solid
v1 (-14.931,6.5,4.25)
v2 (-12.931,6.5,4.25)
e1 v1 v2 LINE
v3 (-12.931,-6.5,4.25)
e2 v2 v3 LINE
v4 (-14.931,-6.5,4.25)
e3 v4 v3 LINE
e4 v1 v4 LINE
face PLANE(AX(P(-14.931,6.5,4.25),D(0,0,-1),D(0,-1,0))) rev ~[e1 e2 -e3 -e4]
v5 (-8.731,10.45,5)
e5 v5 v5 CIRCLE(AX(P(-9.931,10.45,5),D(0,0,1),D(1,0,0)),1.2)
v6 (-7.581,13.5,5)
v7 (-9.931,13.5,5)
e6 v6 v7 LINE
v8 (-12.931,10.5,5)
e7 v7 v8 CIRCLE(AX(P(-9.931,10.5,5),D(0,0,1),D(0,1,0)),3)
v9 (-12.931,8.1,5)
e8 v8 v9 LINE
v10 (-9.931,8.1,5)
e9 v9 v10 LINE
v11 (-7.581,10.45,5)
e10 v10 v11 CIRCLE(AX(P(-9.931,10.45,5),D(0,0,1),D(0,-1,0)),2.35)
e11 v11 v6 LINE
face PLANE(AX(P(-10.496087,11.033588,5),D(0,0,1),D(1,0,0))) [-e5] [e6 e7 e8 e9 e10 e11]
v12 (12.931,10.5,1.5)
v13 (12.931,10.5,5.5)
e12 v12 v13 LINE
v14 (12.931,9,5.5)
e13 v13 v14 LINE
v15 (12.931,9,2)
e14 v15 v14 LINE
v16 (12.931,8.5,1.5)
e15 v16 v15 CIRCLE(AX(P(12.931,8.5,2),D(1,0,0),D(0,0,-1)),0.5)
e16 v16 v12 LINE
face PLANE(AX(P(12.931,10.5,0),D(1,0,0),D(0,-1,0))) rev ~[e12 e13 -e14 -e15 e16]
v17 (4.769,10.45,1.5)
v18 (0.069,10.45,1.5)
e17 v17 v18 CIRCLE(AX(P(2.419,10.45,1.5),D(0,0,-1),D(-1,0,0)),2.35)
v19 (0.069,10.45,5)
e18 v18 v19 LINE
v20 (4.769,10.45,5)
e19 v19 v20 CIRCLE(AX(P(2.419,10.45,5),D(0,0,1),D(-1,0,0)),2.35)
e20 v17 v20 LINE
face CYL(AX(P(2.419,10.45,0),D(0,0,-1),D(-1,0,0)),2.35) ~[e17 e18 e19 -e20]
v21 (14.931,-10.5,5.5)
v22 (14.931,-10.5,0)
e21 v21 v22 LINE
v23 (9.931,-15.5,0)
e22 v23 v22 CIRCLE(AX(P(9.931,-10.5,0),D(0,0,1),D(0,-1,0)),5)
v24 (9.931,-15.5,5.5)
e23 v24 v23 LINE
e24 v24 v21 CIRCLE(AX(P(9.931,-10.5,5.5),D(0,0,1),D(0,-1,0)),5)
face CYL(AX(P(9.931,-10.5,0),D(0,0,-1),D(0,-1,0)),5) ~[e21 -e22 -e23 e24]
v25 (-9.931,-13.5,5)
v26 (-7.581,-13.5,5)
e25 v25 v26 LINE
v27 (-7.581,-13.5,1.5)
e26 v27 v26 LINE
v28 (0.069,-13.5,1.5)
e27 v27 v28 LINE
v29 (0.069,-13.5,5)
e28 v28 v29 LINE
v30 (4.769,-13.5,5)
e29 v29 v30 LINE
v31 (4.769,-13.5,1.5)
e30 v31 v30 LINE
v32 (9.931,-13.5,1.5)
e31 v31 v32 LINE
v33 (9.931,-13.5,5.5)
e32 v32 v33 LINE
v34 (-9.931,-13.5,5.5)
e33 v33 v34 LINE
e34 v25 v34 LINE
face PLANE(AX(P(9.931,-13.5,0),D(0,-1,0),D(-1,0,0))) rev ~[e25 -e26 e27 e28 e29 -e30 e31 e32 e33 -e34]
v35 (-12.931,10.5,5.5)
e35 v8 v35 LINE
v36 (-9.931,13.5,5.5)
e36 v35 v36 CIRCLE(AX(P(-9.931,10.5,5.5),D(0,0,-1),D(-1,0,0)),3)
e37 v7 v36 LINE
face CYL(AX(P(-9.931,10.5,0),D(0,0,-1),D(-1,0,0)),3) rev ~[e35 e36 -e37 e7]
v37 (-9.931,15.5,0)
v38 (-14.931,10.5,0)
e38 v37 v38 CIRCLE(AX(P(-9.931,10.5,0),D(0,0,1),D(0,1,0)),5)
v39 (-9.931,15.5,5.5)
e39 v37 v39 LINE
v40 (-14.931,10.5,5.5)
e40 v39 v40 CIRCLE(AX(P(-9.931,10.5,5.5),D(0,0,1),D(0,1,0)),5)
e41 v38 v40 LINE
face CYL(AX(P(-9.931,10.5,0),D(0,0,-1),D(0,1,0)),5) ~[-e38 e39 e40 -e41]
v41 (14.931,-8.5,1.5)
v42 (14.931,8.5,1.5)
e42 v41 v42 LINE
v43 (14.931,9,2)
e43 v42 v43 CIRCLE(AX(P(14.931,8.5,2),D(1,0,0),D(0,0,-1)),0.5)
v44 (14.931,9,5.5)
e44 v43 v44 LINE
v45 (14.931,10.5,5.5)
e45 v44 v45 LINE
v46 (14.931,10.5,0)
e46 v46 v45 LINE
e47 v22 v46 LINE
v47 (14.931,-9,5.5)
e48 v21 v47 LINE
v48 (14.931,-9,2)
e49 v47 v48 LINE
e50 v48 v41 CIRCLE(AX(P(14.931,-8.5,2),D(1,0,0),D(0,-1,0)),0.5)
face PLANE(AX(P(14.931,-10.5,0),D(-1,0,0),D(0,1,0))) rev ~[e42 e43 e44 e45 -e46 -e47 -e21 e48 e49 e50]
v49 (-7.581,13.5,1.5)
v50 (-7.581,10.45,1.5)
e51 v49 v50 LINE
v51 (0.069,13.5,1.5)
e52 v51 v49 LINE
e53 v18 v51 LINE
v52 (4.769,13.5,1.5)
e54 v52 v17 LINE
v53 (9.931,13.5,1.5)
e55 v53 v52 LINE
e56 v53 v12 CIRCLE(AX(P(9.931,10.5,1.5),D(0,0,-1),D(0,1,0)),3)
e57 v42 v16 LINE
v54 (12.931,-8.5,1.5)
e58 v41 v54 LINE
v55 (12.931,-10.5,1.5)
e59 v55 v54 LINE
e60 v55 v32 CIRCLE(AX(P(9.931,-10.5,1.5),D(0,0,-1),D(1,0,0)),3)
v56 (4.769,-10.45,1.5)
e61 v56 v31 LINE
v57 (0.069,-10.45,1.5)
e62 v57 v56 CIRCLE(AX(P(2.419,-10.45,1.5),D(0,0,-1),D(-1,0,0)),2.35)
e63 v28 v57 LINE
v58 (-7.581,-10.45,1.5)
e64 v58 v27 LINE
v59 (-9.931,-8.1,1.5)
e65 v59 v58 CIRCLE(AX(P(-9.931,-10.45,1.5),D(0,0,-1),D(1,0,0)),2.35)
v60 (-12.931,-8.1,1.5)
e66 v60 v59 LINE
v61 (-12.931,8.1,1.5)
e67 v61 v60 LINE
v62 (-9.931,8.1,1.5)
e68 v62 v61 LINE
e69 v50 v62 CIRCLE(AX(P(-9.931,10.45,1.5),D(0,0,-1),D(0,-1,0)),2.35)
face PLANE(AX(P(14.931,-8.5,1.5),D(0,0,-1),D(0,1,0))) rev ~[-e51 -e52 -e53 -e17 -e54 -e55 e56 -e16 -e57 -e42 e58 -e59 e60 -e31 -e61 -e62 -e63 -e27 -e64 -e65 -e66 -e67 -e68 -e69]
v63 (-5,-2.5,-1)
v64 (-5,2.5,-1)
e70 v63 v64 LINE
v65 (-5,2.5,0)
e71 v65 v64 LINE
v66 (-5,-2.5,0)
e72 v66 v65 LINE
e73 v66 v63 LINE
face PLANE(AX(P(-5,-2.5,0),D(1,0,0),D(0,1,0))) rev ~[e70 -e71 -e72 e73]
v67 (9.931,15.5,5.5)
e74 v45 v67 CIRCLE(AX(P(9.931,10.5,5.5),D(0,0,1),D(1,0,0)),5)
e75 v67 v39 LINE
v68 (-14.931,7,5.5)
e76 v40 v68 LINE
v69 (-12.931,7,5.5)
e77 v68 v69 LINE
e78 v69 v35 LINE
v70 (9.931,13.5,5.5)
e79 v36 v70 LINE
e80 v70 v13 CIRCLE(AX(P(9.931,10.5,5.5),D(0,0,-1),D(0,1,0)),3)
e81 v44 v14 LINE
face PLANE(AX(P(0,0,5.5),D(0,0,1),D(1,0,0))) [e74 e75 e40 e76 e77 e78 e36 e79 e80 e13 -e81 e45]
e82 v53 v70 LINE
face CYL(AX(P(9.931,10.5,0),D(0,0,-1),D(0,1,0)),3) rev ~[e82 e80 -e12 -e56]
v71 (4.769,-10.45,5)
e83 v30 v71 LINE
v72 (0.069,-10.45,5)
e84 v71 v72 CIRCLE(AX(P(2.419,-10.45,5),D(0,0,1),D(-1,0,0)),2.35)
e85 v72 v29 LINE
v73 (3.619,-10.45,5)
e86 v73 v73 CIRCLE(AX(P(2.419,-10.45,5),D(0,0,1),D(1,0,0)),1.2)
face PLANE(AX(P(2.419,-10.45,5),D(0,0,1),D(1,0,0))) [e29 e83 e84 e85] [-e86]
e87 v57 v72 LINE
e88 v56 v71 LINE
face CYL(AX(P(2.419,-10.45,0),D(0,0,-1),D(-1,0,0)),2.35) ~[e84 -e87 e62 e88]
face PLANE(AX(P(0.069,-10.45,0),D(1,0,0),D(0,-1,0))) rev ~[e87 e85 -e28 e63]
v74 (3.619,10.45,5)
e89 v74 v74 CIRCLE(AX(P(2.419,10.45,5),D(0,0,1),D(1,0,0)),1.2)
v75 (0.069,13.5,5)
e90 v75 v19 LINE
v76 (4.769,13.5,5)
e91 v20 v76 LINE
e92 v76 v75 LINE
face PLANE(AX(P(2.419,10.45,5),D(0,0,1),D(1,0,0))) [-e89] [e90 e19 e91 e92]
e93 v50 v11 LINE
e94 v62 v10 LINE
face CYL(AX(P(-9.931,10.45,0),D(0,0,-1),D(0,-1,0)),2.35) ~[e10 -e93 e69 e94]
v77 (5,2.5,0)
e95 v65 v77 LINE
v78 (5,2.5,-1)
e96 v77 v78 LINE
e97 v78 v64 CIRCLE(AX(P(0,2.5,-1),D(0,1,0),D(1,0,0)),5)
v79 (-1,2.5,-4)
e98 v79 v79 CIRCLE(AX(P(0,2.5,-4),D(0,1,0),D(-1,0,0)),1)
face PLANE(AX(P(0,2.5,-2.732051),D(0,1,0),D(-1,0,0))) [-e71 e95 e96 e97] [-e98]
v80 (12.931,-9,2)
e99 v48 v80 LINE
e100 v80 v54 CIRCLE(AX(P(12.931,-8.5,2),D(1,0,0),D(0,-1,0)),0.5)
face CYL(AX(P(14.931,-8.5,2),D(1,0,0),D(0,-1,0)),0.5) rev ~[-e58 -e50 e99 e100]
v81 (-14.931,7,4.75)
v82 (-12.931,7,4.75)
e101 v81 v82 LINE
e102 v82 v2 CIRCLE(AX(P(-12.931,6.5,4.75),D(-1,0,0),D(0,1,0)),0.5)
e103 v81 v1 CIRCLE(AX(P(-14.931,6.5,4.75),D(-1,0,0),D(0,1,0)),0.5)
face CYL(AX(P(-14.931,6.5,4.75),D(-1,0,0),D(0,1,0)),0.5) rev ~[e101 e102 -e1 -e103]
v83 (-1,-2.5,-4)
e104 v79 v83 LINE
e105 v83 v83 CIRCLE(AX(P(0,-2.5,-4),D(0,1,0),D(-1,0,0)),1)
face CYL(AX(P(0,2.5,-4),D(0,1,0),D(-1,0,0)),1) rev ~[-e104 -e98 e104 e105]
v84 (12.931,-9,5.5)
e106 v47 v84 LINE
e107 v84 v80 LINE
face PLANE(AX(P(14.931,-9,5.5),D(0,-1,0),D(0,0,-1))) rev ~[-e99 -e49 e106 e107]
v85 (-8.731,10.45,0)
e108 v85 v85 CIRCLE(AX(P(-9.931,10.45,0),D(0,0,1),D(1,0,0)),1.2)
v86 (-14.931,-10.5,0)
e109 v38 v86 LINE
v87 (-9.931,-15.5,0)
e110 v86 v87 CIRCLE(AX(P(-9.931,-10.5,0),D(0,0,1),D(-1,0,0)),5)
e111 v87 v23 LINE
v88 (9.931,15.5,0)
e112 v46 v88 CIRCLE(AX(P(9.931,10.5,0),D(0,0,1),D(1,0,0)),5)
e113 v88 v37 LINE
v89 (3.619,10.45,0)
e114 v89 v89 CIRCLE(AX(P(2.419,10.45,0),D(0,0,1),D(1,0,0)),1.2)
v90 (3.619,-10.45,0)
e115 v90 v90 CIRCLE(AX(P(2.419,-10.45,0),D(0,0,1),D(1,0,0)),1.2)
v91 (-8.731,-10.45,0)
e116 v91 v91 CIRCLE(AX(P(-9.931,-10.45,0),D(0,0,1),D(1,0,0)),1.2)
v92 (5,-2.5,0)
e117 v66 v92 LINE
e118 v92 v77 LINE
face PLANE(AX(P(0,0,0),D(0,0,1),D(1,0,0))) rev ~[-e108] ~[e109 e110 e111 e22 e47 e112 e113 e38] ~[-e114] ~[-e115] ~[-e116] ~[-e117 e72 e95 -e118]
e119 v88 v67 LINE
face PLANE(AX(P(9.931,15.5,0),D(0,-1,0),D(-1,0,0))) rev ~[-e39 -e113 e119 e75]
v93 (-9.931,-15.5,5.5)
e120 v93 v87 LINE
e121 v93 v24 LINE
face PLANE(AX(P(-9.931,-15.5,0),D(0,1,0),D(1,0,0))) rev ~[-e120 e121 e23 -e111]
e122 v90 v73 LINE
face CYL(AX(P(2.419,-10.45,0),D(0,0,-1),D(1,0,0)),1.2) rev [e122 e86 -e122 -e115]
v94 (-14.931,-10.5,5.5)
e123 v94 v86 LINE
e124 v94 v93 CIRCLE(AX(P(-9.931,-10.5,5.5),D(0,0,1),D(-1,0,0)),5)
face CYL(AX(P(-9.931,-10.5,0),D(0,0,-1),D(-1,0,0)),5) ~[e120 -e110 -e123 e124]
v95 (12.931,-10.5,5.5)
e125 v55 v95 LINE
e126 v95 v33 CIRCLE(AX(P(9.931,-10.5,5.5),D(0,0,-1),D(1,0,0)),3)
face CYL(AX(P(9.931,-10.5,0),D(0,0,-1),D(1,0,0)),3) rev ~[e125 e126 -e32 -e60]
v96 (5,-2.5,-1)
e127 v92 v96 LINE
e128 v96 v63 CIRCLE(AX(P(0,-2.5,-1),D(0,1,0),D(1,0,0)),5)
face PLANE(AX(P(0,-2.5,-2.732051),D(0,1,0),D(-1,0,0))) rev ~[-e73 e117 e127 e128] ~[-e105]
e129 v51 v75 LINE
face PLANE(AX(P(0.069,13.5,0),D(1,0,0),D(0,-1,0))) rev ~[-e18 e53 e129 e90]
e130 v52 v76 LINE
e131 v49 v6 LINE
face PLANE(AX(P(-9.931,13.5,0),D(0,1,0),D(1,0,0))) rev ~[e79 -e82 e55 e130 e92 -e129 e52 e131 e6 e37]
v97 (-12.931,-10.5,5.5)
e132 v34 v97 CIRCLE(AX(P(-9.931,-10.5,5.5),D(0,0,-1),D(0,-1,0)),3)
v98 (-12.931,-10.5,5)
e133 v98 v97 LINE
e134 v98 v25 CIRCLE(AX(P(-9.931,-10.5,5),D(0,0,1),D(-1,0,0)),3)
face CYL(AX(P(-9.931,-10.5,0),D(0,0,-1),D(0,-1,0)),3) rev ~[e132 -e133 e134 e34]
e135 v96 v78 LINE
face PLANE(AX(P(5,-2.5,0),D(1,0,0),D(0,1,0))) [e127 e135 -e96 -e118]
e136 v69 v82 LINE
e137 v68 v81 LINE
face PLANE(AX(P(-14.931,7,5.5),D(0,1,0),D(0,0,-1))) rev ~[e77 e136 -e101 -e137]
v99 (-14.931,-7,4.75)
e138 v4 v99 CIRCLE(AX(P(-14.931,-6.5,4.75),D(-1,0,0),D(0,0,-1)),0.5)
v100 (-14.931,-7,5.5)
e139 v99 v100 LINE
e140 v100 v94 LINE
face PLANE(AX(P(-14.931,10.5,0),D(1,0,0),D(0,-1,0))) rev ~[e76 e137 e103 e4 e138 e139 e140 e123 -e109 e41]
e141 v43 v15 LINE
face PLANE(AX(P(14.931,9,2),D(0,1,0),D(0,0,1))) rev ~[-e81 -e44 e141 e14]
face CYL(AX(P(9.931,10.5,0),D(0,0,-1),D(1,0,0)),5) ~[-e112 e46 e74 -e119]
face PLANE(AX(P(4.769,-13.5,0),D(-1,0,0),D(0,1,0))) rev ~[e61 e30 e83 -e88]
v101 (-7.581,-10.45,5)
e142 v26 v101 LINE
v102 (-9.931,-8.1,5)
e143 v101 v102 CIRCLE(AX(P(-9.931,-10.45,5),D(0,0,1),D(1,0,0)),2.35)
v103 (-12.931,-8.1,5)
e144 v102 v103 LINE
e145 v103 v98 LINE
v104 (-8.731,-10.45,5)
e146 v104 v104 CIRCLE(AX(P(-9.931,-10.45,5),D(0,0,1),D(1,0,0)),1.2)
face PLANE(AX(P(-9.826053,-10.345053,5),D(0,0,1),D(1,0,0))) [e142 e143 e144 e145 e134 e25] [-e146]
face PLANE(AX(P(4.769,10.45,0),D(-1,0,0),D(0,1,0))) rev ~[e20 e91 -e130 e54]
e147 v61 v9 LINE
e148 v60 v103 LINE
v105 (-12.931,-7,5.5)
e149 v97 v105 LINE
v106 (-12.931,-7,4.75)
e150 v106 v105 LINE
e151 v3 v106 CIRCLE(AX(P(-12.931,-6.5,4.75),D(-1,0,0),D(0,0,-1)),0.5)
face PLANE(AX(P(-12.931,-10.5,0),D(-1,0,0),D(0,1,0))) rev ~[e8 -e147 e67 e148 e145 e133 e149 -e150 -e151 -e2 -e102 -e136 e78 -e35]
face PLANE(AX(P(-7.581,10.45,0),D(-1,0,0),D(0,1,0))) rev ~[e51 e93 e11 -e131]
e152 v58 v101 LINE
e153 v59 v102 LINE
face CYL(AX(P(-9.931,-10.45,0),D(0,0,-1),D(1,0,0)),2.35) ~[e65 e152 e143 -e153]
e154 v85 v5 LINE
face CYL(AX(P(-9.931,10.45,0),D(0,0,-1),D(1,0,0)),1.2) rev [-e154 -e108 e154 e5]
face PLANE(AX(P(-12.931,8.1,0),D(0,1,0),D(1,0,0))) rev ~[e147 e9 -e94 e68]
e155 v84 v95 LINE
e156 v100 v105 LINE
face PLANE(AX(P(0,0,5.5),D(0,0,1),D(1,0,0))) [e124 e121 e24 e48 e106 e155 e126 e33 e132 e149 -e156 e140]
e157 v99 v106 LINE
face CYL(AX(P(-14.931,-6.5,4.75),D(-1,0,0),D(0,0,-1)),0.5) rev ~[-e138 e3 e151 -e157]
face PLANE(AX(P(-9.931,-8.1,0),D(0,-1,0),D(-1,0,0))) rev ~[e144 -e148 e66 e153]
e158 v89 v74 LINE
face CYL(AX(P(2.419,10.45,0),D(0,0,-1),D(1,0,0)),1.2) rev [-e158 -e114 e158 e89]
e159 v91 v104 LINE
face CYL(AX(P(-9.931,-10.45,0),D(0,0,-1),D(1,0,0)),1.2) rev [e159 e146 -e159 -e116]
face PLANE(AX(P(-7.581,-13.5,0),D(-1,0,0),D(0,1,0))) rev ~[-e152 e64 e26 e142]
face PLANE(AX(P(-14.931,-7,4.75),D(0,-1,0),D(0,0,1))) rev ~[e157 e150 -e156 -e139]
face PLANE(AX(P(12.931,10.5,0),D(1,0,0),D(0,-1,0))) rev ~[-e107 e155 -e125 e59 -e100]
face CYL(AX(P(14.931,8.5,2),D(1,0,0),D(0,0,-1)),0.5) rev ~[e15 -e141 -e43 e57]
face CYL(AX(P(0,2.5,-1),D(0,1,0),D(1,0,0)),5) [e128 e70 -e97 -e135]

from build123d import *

# Parameters (mm, degrees)
F0_R      = 1.2
F1_DEPTH  = 1.5
F2_DEPTH  = 5
F3_DEPTH  = 5.5
F5_DEPTH  = 2
F7_DEPTH  = 2
F8_W      = 10
F8_H      = 5
F9_DEPTH  = 1
F10_R     = 1
F11_DEPTH = 5


# Not quite as in the source:
# - a feature names something its author has since deleted; it is built from what else it names


with BuildPart() as f1:
    # F0 (on Top) → F1 (new body)
    with BuildSketch(Plane.XY):
        with BuildLine():
            Line((14.9310000289, -10.5), (14.9310000289, 10.5))
            ThreePointArc((14.9310000289, 10.5), (13.4665339264, 14.0355339264), (9.931, 15.5000000289))
            Line((9.931, 15.5000000289), (-9.931, 15.5000000289))
            ThreePointArc((-9.931, 15.5000000289), (-13.4665339264, 14.0355339264), (-14.9310000289, 10.5))
            Line((-14.9310000289, 10.5), (-14.9310000289, -10.5))
            ThreePointArc((-14.9310000289, -10.5), (-13.4665339264, -14.0355339264), (-9.931, -15.5000000289))
            Line((-9.931, -15.5000000289), (9.931, -15.5000000289))
            ThreePointArc((9.931, -15.5000000289), (13.4665339264, -14.0355339264), (14.9310000289, -10.5))
        make_face()
        with BuildLine():
            Line((-9.931, 13.5000000289), (-7.581, 13.5000000289))
            Line((-7.581, 13.5000000289), (0.069, 13.5000000289))
            Line((0.069, 13.5000000289), (4.769, 13.5000000289))
            Line((4.769, 13.5000000289), (9.931, 13.5000000289))
            ThreePointArc((9.931, 13.5000000289), (12.052320364, 12.621320364), (12.9310000289, 10.5))
            Line((12.9310000289, 10.5), (12.9310000289, -10.5))
            ThreePointArc((12.9310000289, -10.5), (12.052320364, -12.621320364), (9.931, -13.5000000289))
            Line((9.931, -13.5000000289), (4.769, -13.5000000289))
            Line((4.769, -13.5000000289), (0.069, -13.5000000289))
            Line((0.069, -13.5000000289), (-7.581, -13.5000000289))
            Line((-7.581, -13.5000000289), (-9.931, -13.5000000289))
            ThreePointArc((-9.931, -13.5000000289), (-12.052320364, -12.621320364), (-12.9310000289, -10.5))
            Line((-12.9310000289, -10.5), (-12.9310000289, -8.1))
            Line((-12.9310000289, -8.1), (-12.9310000289, 8.1))
            Line((-12.9310000289, 8.1), (-12.9310000289, 10.5))
            ThreePointArc((-12.9310000289, 10.5), (-12.052320364, 12.621320364), (-9.931, 13.5000000289))
        make_face(mode=Mode.SUBTRACT)
        with BuildLine():
            ThreePointArc((4.769, -10.45), (2.419, -8.1), (0.069, -10.45))
            ThreePointArc((0.069, -10.45), (2.419, -12.8), (4.769, -10.45))
        make_face()
        with Locations((2.419, -10.45)):
            Circle(F0_R, mode=Mode.SUBTRACT)
        with BuildLine():
            ThreePointArc((4.769, 10.45), (2.419, 12.8), (0.069, 10.45))
            ThreePointArc((0.069, 10.45), (2.419, 8.1), (4.769, 10.45))
        make_face()
        with Locations((2.419, 10.45)):
            Circle(F0_R, mode=Mode.SUBTRACT)
        with BuildLine():
            ThreePointArc((-9.931, 8.1), (-11.5927009358, 12.1117009358), (-7.581, 10.45))
            Line((-7.581, 10.45), (-7.581, 13.5000000289))
            Line((-7.581, 13.5000000289), (-9.931, 13.5000000289))
            ThreePointArc((-9.931, 13.5000000289), (-12.052320364, 12.621320364), (-12.9310000289, 10.5))
            Line((-12.9310000289, 10.5), (-12.9310000289, 8.1))
            Line((-12.9310000289, 8.1), (-9.931, 8.1))
        make_face()
        with BuildLine():
            Line((-9.931, -8.1), (-12.9310000289, -8.1))
            Line((-12.9310000289, -8.1), (-12.9310000289, -10.5))
            ThreePointArc((-12.9310000289, -10.5), (-12.052320364, -12.621320364), (-9.931, -13.5000000289))
            Line((-9.931, -13.5000000289), (-7.581, -13.5000000289))
            Line((-7.581, -13.5000000289), (-7.581, -10.45))
            ThreePointArc((-7.581, -10.45), (-11.5927009358, -12.1117009358), (-9.931, -8.1))
        make_face()
        with BuildLine():
            ThreePointArc((-7.581, -10.45), (-8.2692990642, -8.7882990642), (-9.931, -8.1))
            ThreePointArc((-9.931, -8.1), (-11.5927009358, -12.1117009358), (-7.581, -10.45))
        make_face()
        with Locations((-9.931, -10.45)):
            Circle(F0_R, mode=Mode.SUBTRACT)
        with BuildLine():
            Line((0.069, -10.45), (0.069, -13.5000000289))
            Line((0.069, -13.5000000289), (4.769, -13.5000000289))
            Line((4.769, -13.5000000289), (4.769, -10.45))
            ThreePointArc((4.769, -10.45), (2.419, -12.8), (0.069, -10.45))
        make_face()
        with BuildLine():
            ThreePointArc((-9.931, 8.1), (-8.2692990642, 8.7882990642), (-7.581, 10.45))
            ThreePointArc((-7.581, 10.45), (-11.5927009358, 12.1117009358), (-9.931, 8.1))
        make_face()
        with Locations((-9.931, 10.45)):
            Circle(F0_R, mode=Mode.SUBTRACT)
        with BuildLine():
            Line((4.769, 13.5000000289), (0.069, 13.5000000289))
            Line((0.069, 13.5000000289), (0.069, 10.45))
            ThreePointArc((0.069, 10.45), (2.419, 12.8), (4.769, 10.45))
            Line((4.769, 10.45), (4.769, 13.5000000289))
        make_face()
        with BuildLine():
            Line((-7.581, 13.5000000289), (-7.581, 10.45))
            ThreePointArc((-7.581, 10.45), (-8.2692990642, 8.7882990642), (-9.931, 8.1))
            Line((-9.931, 8.1), (-12.9310000289, 8.1))
            Line((-12.9310000289, 8.1), (-12.9310000289, -8.1))
            Line((-12.9310000289, -8.1), (-9.931, -8.1))
            ThreePointArc((-9.931, -8.1), (-8.2692990642, -8.7882990642), (-7.581, -10.45))
            Line((-7.581, -10.45), (-7.581, -13.5000000289))
            Line((-7.581, -13.5000000289), (0.069, -13.5000000289))
            Line((0.069, -13.5000000289), (0.069, -10.45))
            ThreePointArc((0.069, -10.45), (2.419, -8.1), (4.769, -10.45))
            Line((4.769, -10.45), (4.769, -13.5000000289))
            Line((4.769, -13.5000000289), (9.931, -13.5000000289))
            ThreePointArc((9.931, -13.5000000289), (12.052320364, -12.621320364), (12.9310000289, -10.5))
            Line((12.9310000289, -10.5), (12.9310000289, 10.5))
            ThreePointArc((12.9310000289, 10.5), (12.052320364, 12.621320364), (9.931, 13.5000000289))
            Line((9.931, 13.5000000289), (4.769, 13.5000000289))
            Line((4.769, 13.5000000289), (4.769, 10.45))
            ThreePointArc((4.769, 10.45), (2.419, 8.1), (0.069, 10.45))
            Line((0.069, 10.45), (0.069, 13.5000000289))
            Line((0.069, 13.5000000289), (-7.581, 13.5000000289))
        make_face()
    extrude(amount=F1_DEPTH)

    # F0 (on Top) → F2 (join)
    with BuildSketch(Plane.XY):
        with BuildLine():
            ThreePointArc((-9.931, 8.1), (-11.5927009358, 12.1117009358), (-7.581, 10.45))
            Line((-7.581, 10.45), (-7.581, 13.5000000289))
            Line((-7.581, 13.5000000289), (-9.931, 13.5000000289))
            ThreePointArc((-9.931, 13.5000000289), (-12.052320364, 12.621320364), (-12.9310000289, 10.5))
            Line((-12.9310000289, 10.5), (-12.9310000289, 8.1))
            Line((-12.9310000289, 8.1), (-9.931, 8.1))
        make_face()
        with BuildLine():
            ThreePointArc((-9.931, 8.1), (-8.2692990642, 8.7882990642), (-7.581, 10.45))
            ThreePointArc((-7.581, 10.45), (-11.5927009358, 12.1117009358), (-9.931, 8.1))
        make_face()
        with Locations((-9.931, 10.45)):
            Circle(F0_R, mode=Mode.SUBTRACT)
        with BuildLine():
            ThreePointArc((4.769, 10.45), (2.419, 12.8), (0.069, 10.45))
            ThreePointArc((0.069, 10.45), (2.419, 8.1), (4.769, 10.45))
        make_face()
        with Locations((2.419, 10.45)):
            Circle(F0_R, mode=Mode.SUBTRACT)
        with BuildLine():
            Line((4.769, 13.5000000289), (0.069, 13.5000000289))
            Line((0.069, 13.5000000289), (0.069, 10.45))
            ThreePointArc((0.069, 10.45), (2.419, 12.8), (4.769, 10.45))
            Line((4.769, 10.45), (4.769, 13.5000000289))
        make_face()
        with BuildLine():
            ThreePointArc((4.769, -10.45), (2.419, -8.1), (0.069, -10.45))
            ThreePointArc((0.069, -10.45), (2.419, -12.8), (4.769, -10.45))
        make_face()
        with Locations((2.419, -10.45)):
            Circle(F0_R, mode=Mode.SUBTRACT)
        with BuildLine():
            Line((0.069, -10.45), (0.069, -13.5000000289))
            Line((0.069, -13.5000000289), (4.769, -13.5000000289))
            Line((4.769, -13.5000000289), (4.769, -10.45))
            ThreePointArc((4.769, -10.45), (2.419, -12.8), (0.069, -10.45))
        make_face()
        with BuildLine():
            ThreePointArc((-7.581, -10.45), (-8.2692990642, -8.7882990642), (-9.931, -8.1))
            ThreePointArc((-9.931, -8.1), (-11.5927009358, -12.1117009358), (-7.581, -10.45))
        make_face()
        with Locations((-9.931, -10.45)):
            Circle(F0_R, mode=Mode.SUBTRACT)
        with BuildLine():
            Line((-9.931, -8.1), (-12.9310000289, -8.1))
            Line((-12.9310000289, -8.1), (-12.9310000289, -10.5))
            ThreePointArc((-12.9310000289, -10.5), (-12.052320364, -12.621320364), (-9.931, -13.5000000289))
            Line((-9.931, -13.5000000289), (-7.581, -13.5000000289))
            Line((-7.581, -13.5000000289), (-7.581, -10.45))
            ThreePointArc((-7.581, -10.45), (-11.5927009358, -12.1117009358), (-9.931, -8.1))
        make_face()
    extrude(amount=F2_DEPTH)

    # F0 (on Top) → F3 (join)
    with BuildSketch(Plane.XY):
        with BuildLine():
            Line((14.9310000289, -10.5), (14.9310000289, 10.5))
            ThreePointArc((14.9310000289, 10.5), (13.4665339264, 14.0355339264), (9.931, 15.5000000289))
            Line((9.931, 15.5000000289), (-9.931, 15.5000000289))
            ThreePointArc((-9.931, 15.5000000289), (-13.4665339264, 14.0355339264), (-14.9310000289, 10.5))
            Line((-14.9310000289, 10.5), (-14.9310000289, -10.5))
            ThreePointArc((-14.9310000289, -10.5), (-13.4665339264, -14.0355339264), (-9.931, -15.5000000289))
            Line((-9.931, -15.5000000289), (9.931, -15.5000000289))
            ThreePointArc((9.931, -15.5000000289), (13.4665339264, -14.0355339264), (14.9310000289, -10.5))
        make_face()
        with BuildLine():
            Line((-9.931, 13.5000000289), (-7.581, 13.5000000289))
            Line((-7.581, 13.5000000289), (0.069, 13.5000000289))
            Line((0.069, 13.5000000289), (4.769, 13.5000000289))
            Line((4.769, 13.5000000289), (9.931, 13.5000000289))
            ThreePointArc((9.931, 13.5000000289), (12.052320364, 12.621320364), (12.9310000289, 10.5))
            Line((12.9310000289, 10.5), (12.9310000289, -10.5))
            ThreePointArc((12.9310000289, -10.5), (12.052320364, -12.621320364), (9.931, -13.5000000289))
            Line((9.931, -13.5000000289), (4.769, -13.5000000289))
            Line((4.769, -13.5000000289), (0.069, -13.5000000289))
            Line((0.069, -13.5000000289), (-7.581, -13.5000000289))
            Line((-7.581, -13.5000000289), (-9.931, -13.5000000289))
            ThreePointArc((-9.931, -13.5000000289), (-12.052320364, -12.621320364), (-12.9310000289, -10.5))
            Line((-12.9310000289, -10.5), (-12.9310000289, -8.1))
            Line((-12.9310000289, -8.1), (-12.9310000289, 8.1))
            Line((-12.9310000289, 8.1), (-12.9310000289, 10.5))
            ThreePointArc((-12.9310000289, 10.5), (-12.052320364, 12.621320364), (-9.931, 13.5000000289))
        make_face(mode=Mode.SUBTRACT)
    extrude(amount=F3_DEPTH)

    # F4 (on face) → F5 (cut)
    with BuildSketch(Plane(origin=(-14.9310000289, 0, 0), x_dir=(0, -1, 0), z_dir=(-1, 0, 0))):
        with BuildLine():
            Line((7, 5.5), (-7, 5.5))
            Line((-7, 5.5), (-7, 4.75))
            ThreePointArc((-7, 4.75), (-6.8535533906, 4.3964466094), (-6.5, 4.25))
            Line((-6.5, 4.25), (6.5, 4.25))
            ThreePointArc((6.5, 4.25), (6.8535533906, 4.3964466094), (7, 4.75))
            Line((7, 4.75), (7, 5.5))
        make_face()
    extrude(amount=-F5_DEPTH, mode=Mode.SUBTRACT)

    # F6 (on face) → F7 (cut)
    with BuildSketch(Plane.YZ.offset(14.9310000289)):
        with BuildLine():
            Line((9, 2), (9, 5.5))
            Line((9, 5.5), (-9, 5.5))
            Line((-9, 5.5), (-9, 2))
            ThreePointArc((-9, 2), (-8.8535533906, 1.6464466094), (-8.5, 1.5))
            Line((-8.5, 1.5), (8.5, 1.5))
            ThreePointArc((8.5, 1.5), (8.8535533906, 1.6464466094), (9, 2))
        make_face()
    extrude(amount=-F7_DEPTH, mode=Mode.SUBTRACT)

    # F8 (on face) → F9 (join)
    with BuildSketch(Plane.XY):
        Rectangle(F8_W, F8_H)
    extrude(amount=-F9_DEPTH)

    # F10 (on face) → F11 (join)
    with BuildSketch(Plane(origin=(0, 2.5, 0), x_dir=(-1, 0, 0), z_dir=(0, 1, 0))):
        with BuildLine():
            Line((5, -1), (-5, -1))
            ThreePointArc((-5, -1), (0, -6), (5, -1))
        make_face()
        with Locations((0, -4)):
            Circle(F10_R, mode=Mode.SUBTRACT)
    extrude(amount=-F11_DEPTH)


solid = f1.part
